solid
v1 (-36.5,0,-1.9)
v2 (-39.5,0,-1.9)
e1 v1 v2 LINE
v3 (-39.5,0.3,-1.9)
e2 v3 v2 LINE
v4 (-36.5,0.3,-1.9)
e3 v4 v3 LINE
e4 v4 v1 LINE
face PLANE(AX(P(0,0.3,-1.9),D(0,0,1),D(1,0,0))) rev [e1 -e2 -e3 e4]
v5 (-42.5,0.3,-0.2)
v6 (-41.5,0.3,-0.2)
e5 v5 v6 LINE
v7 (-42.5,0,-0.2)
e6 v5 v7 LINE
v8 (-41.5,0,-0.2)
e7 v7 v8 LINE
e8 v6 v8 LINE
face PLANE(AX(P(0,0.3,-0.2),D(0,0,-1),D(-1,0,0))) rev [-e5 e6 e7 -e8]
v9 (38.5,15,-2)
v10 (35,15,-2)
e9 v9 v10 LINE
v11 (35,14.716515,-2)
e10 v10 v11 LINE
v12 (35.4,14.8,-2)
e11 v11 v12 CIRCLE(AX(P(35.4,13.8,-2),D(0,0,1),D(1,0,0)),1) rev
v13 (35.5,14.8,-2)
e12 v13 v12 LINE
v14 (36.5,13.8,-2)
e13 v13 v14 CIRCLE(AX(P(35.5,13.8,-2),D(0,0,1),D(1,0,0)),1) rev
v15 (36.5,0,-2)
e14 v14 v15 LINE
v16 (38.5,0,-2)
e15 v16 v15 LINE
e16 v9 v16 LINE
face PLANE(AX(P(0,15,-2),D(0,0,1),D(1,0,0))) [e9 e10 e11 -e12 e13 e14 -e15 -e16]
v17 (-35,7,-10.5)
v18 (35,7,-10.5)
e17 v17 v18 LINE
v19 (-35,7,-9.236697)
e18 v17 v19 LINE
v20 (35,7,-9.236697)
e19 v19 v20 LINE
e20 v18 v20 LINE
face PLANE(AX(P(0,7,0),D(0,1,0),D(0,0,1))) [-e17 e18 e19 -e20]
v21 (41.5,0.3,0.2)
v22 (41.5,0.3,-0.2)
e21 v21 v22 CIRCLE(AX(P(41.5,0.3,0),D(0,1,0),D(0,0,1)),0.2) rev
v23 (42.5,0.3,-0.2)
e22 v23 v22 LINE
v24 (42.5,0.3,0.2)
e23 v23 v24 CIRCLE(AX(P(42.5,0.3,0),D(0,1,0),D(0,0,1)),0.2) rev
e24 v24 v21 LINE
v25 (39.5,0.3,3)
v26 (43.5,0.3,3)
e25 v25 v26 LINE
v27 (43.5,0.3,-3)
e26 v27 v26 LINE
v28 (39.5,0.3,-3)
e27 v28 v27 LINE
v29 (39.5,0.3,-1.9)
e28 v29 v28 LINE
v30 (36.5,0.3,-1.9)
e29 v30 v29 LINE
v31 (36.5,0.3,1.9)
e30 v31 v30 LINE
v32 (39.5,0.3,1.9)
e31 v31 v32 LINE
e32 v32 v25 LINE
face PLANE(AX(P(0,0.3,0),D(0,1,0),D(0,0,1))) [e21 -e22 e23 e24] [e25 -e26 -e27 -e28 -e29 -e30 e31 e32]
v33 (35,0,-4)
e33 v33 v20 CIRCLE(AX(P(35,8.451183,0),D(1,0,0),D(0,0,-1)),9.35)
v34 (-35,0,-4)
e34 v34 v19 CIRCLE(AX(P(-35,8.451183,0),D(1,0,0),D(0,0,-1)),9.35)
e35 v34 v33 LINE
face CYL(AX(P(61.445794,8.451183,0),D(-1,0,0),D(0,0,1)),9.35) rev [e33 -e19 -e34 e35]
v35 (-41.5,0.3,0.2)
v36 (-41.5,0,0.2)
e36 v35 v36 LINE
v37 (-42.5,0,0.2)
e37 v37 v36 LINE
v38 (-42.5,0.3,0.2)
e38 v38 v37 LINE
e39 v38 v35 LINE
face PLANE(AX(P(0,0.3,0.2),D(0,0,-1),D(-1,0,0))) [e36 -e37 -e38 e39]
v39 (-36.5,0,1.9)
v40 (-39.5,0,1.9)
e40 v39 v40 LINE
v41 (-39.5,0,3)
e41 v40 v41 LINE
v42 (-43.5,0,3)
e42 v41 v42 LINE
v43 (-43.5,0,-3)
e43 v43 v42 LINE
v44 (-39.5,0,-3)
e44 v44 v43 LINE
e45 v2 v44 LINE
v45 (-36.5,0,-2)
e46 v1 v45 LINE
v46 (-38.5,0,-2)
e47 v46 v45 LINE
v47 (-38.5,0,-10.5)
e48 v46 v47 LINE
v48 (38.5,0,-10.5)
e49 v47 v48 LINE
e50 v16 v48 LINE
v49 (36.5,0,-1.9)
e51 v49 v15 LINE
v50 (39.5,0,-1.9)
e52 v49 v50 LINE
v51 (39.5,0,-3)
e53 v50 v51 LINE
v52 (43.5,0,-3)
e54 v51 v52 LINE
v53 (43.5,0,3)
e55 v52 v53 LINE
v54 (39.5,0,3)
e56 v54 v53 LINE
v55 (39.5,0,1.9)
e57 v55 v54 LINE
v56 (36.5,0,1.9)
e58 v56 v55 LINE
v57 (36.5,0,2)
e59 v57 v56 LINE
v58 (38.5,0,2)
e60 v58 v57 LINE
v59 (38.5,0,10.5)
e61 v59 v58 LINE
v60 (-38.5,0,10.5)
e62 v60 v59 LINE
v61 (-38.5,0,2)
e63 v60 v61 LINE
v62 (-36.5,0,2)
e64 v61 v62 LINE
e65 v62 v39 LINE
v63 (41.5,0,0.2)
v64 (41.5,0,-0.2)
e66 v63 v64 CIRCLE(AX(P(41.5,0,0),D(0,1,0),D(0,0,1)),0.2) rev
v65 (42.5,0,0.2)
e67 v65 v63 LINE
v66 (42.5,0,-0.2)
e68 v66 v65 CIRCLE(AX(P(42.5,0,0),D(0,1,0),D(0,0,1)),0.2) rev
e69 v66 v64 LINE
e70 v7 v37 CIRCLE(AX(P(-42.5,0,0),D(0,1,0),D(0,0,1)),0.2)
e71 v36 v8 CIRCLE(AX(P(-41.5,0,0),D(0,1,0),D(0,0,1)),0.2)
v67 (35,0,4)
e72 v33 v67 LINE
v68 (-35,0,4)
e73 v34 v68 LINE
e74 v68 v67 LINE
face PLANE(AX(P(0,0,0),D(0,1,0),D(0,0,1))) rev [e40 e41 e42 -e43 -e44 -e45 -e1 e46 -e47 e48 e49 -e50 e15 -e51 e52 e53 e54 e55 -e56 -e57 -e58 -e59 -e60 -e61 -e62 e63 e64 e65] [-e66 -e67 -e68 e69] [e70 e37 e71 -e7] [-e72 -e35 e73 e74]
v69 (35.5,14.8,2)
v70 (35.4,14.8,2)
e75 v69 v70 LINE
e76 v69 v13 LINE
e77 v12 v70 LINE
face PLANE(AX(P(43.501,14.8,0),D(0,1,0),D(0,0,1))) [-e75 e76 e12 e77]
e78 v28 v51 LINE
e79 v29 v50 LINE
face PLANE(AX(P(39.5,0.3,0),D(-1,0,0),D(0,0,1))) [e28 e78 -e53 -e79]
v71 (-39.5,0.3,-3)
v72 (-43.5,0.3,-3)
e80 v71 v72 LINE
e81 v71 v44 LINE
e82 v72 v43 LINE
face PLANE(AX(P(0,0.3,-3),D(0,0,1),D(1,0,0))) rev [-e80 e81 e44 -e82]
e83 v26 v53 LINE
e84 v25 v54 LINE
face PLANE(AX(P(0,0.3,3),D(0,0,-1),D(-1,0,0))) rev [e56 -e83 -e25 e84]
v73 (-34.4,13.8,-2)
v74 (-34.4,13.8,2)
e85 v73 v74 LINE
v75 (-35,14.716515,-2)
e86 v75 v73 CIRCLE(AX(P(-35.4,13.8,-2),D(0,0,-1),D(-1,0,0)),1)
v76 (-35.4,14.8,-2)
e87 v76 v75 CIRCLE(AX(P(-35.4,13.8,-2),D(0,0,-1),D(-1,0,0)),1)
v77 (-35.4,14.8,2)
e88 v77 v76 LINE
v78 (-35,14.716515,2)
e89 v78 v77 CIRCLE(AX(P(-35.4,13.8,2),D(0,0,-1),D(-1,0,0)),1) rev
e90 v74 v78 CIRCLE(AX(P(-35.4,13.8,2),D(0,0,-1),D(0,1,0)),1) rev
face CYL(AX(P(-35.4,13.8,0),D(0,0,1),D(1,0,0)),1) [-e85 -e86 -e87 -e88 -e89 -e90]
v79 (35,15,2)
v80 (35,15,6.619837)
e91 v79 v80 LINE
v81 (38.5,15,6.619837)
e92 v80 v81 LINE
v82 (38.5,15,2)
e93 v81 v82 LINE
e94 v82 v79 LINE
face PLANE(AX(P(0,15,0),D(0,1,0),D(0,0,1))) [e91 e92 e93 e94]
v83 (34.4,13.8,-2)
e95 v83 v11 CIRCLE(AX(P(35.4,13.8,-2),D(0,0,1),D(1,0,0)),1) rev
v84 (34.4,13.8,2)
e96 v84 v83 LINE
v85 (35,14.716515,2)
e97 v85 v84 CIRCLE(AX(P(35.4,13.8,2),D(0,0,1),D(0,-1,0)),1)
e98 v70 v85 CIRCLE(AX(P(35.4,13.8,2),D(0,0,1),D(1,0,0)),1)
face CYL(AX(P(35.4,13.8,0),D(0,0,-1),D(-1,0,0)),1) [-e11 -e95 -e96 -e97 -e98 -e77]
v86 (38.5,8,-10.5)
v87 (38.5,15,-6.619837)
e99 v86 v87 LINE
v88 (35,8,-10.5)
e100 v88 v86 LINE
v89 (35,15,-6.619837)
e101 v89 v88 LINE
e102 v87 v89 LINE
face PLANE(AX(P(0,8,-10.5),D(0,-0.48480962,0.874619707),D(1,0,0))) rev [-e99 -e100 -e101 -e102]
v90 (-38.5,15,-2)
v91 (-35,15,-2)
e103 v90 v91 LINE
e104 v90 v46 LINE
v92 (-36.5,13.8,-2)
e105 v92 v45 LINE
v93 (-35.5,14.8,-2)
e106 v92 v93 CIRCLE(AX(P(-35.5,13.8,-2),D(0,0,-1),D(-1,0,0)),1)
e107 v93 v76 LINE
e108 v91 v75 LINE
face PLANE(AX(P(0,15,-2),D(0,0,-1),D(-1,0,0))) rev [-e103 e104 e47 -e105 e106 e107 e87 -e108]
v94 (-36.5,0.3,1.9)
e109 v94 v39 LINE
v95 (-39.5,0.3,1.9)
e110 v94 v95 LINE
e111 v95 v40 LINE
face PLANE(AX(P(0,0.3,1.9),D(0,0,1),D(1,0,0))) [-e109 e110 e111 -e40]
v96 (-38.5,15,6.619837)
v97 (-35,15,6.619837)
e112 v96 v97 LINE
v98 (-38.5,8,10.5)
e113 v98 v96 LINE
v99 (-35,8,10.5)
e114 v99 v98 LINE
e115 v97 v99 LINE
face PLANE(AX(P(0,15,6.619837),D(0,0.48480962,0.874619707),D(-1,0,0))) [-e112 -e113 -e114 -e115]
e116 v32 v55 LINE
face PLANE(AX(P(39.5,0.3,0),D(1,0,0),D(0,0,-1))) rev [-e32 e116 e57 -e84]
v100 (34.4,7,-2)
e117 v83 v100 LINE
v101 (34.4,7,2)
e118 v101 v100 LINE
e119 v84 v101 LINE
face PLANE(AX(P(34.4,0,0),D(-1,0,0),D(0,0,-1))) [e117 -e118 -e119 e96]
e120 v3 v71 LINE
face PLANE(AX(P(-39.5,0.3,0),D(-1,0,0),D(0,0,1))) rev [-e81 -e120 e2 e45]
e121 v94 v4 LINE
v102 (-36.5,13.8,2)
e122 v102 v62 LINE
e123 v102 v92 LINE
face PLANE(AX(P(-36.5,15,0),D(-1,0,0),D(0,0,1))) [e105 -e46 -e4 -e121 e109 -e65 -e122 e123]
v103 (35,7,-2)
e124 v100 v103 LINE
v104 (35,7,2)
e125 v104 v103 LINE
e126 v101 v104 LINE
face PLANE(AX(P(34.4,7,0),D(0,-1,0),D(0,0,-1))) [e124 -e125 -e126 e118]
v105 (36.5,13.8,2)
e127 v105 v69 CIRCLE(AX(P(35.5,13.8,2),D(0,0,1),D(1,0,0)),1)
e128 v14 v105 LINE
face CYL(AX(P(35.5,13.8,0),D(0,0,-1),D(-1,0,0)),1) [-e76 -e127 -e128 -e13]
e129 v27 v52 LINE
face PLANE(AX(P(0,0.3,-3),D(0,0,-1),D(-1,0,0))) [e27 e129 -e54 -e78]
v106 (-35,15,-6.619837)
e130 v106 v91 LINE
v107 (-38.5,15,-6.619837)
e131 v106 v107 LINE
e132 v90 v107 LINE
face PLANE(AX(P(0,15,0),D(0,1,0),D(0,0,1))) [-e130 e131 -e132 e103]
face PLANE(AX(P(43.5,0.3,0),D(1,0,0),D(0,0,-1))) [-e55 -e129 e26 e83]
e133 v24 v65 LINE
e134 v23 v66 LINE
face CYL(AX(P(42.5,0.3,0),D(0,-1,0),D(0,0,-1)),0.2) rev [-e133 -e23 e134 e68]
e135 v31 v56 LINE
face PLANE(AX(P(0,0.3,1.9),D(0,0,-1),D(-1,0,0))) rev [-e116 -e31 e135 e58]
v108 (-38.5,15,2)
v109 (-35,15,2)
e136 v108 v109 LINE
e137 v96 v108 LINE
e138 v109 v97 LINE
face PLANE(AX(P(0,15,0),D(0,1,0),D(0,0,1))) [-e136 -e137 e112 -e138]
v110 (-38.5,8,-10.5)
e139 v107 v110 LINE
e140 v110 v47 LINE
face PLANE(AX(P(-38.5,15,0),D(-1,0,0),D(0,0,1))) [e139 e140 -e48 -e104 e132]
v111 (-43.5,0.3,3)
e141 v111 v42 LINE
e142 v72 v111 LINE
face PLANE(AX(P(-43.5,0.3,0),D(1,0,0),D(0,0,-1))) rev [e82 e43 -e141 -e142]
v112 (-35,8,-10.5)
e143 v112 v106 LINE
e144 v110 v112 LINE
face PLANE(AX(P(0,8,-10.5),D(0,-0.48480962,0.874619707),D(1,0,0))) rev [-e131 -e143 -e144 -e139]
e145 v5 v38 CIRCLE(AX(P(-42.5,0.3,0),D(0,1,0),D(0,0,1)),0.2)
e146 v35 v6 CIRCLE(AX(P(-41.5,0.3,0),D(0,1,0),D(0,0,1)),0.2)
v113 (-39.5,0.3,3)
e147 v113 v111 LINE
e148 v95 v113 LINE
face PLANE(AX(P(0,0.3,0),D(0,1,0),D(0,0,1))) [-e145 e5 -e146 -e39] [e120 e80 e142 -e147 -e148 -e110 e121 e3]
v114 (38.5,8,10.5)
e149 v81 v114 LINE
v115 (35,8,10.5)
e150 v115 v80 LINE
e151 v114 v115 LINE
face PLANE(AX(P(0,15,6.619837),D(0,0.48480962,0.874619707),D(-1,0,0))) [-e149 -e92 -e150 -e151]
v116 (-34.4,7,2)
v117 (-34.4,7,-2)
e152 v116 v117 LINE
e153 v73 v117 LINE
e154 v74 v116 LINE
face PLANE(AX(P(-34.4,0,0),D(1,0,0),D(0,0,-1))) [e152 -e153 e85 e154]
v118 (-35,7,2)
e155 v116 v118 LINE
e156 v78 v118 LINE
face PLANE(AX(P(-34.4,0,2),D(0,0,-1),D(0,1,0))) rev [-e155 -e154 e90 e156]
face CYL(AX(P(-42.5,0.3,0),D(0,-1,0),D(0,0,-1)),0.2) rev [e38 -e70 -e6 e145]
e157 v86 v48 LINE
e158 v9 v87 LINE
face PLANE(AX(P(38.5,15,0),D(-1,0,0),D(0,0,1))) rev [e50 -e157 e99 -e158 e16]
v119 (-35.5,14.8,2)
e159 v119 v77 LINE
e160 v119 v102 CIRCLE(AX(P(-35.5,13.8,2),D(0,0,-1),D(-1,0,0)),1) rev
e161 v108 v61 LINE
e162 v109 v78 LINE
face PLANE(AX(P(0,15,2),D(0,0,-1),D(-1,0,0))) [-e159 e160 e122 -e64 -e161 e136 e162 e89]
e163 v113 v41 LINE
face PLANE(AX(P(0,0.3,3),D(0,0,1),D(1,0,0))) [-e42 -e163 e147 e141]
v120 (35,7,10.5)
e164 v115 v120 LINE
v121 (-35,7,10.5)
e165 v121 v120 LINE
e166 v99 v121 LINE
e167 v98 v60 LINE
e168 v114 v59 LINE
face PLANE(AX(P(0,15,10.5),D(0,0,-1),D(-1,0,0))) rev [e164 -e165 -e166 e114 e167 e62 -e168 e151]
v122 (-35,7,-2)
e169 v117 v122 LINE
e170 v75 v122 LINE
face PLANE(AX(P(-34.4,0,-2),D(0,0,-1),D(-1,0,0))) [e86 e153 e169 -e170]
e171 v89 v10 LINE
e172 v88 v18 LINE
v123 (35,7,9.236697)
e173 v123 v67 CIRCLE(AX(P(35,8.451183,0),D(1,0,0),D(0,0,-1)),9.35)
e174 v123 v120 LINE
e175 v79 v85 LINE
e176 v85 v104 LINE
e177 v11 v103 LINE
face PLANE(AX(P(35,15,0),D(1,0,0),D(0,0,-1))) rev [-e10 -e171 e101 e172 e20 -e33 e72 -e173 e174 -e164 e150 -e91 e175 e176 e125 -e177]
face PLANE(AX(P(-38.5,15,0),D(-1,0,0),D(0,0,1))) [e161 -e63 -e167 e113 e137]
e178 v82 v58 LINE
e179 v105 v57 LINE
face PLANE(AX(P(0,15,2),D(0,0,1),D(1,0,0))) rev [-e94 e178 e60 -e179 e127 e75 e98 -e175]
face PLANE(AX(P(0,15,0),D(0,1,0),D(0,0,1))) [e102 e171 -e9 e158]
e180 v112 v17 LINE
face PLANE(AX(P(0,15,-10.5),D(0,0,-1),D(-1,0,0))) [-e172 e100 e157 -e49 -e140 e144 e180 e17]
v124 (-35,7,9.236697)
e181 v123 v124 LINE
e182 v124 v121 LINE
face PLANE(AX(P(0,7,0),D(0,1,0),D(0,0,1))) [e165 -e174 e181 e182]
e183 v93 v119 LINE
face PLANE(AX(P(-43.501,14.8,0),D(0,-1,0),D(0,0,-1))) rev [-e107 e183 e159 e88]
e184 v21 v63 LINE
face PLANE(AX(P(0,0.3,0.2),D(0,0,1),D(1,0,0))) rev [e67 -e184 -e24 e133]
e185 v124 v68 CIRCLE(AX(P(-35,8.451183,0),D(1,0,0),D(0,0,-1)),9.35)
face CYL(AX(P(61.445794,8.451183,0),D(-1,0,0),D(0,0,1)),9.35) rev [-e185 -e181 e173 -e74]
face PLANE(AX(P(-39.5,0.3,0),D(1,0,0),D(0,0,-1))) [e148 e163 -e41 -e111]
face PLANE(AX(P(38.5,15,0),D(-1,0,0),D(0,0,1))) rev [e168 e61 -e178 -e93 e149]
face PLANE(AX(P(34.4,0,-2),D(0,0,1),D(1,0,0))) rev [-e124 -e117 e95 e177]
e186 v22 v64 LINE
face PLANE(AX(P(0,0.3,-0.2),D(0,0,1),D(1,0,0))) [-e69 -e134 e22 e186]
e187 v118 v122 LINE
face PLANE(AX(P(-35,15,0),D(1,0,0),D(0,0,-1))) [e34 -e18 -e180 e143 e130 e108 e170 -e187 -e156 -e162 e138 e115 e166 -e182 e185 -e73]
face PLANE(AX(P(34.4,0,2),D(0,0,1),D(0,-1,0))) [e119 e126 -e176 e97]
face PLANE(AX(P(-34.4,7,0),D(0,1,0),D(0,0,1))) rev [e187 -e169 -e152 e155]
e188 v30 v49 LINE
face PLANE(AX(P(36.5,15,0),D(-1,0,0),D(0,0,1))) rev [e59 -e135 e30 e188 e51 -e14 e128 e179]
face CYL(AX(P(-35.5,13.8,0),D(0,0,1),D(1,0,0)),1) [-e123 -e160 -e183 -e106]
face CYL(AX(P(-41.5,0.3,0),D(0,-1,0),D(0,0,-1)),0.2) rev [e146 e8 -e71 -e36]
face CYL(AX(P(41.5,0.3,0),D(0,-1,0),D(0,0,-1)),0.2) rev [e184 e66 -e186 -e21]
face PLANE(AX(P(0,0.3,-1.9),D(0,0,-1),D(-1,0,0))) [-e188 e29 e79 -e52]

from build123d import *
from OCP.BRepFilletAPI import BRepFilletAPI_MakeChamfer

# Parameters (mm, degrees)
DODANIE_WYCI_GNI_CIE1_DEPTH   = 15
DODANIE_WYCI_GNI_CIE1_2_DEPTH = 15
SZKIC1_3_W                    = 70
SZKIC1_3_H                    = 6.5
DODANIE_WYCI_GNI_CIE2_DEPTH   = 7
SZKIC2_R                      = 9.35
WYTNIJ_WYCI_GNI_CIE1_DEPTH    = 70
DODANIE_WYCI_GNI_CIE3_DEPTH   = 0.3
SFAZOWANIE1_SIZE              = 7
SFAZOWANIE1_SIZE2             = 3.88016336
WYTNIJ_WYCI_GNI_CIE2_REACH    = 82.607
SZKIC4_W                      = 4
SZKIC4_H                      = 0.2
SZKIC4_3_W                    = 4
SZKIC4_3_H                    = 7.8
DODANIE_WYCI_GNI_CIE4_DEPTH   = 0.6
ZAOKR_GLENIE1_R               = 1


with BuildPart() as part:
    # Szkic1 → Dodanie-wyciągnięcie1 (new body)
    with BuildSketch(Plane(origin=(0, 0, 0), x_dir=(1, 0, 0), z_dir=(0, 1, 0))):
        Polygon((-38.5, -2), (-38.5, -10.5), (-35, -10.5), (-35, 10.5), (-38.5, 10.5), (-38.5, 2), (-36.5, 2), (-36.5, -2), align=None)
    extrude(amount=DODANIE_WYCI_GNI_CIE1_DEPTH)



with BuildPart() as body_2:
    # Szkic1 → Dodanie-wyci_gni_cie1 2 (new body)
    with BuildSketch(Plane(origin=(0, 0, 0), x_dir=(1, 0, 0), z_dir=(0, 1, 0))):
        Polygon((35, 10.5), (35, -10.5), (38.5, -10.5), (38.5, -2), (36.5, -2), (36.5, 2), (38.5, 2), (38.5, 10.5), align=None)
    extrude(amount=DODANIE_WYCI_GNI_CIE1_2_DEPTH)


with BuildPart() as part_1:
    add(part.part)

    add(body_2.part)  # Dodanie-wyciągnięcie2 merges body 2
    # Szkic1<3> → Dodanie-wyciągnięcie2 (add)
    with BuildSketch(Plane(origin=(0, 0, 0), x_dir=(1, 0, 0), z_dir=(0, 1, 0))):
        with Locations((0, -7.25)):
            Rectangle(SZKIC1_3_W, SZKIC1_3_H)
        with Locations((0, 7.25)):
            Rectangle(SZKIC1_3_W, SZKIC1_3_H)
    extrude(amount=DODANIE_WYCI_GNI_CIE2_DEPTH)

    # Szkic2 → Wytnij-wyciągnięcie1 (cut)
    with BuildSketch(Plane(origin=(-35, 0, 0), x_dir=(0, 0, -1), z_dir=(1, 0, 0))):
        with Locations((0, 8.451183349)):
            Circle(SZKIC2_R)
    extrude(amount=WYTNIJ_WYCI_GNI_CIE1_DEPTH, mode=Mode.SUBTRACT)

    # Szkic3 → Dodanie-wyciągnięcie3 (add)
    with BuildSketch(Plane(origin=(0, 0, 0), x_dir=(1, 0, 0), z_dir=(0, 1, 0))):
        with BuildLine():
            Line((-36.5, 0), (-36.5, 1.9))
            Line((-36.5, 1.9), (-39.5, 1.9))
            Line((-39.5, 1.9), (-39.5, 3))
            Line((-39.5, 3), (-43.5, 3))
            Line((-43.5, 3), (-43.5, 0))
            Line((-43.5, 0), (-42.7, 0))
            ThreePointArc((-42.7, 0), (-42.641421356, 0.141421356), (-42.5, 0.2))
            Line((-42.5, 0.2), (-41.5, 0.2))
            ThreePointArc((-41.5, 0.2), (-41.358578644, 0.141421356), (-41.3, 0))
            Line((-41.3, 0), (-36.5, 0))
        make_face()
        with BuildLine():
            Line((-36.5, -1.9), (-36.5, 0))
            Line((-36.5, 0), (-41.3, 0))
            ThreePointArc((-41.3, 0), (-41.358578644, -0.141421356), (-41.5, -0.2))
            Line((-41.5, -0.2), (-42.5, -0.2))
            ThreePointArc((-42.5, -0.2), (-42.641421356, -0.141421356), (-42.7, 0))
            Line((-42.7, 0), (-43.5, 0))
            Line((-43.5, 0), (-43.5, -3))
            Line((-43.5, -3), (-39.5, -3))
            Line((-39.5, -3), (-39.5, -1.9))
            Line((-39.5, -1.9), (-36.5, -1.9))
        make_face()
        with BuildLine():
            Line((41.5, 0.2), (42.5, 0.2))
            ThreePointArc((42.5, 0.2), (42.641421356, 0.141421356), (42.7, 0))
            Line((42.7, 0), (43.5, 0))
            Line((43.5, 0), (43.5, 3))
            Line((43.5, 3), (39.5, 3))
            Line((39.5, 3), (39.5, 1.9))
            Line((39.5, 1.9), (36.5, 1.9))
            Line((36.5, 1.9), (36.5, 0))
            Line((36.5, 0), (41.3, 0))
            ThreePointArc((41.3, 0), (41.358578644, 0.141421356), (41.5, 0.2))
        make_face()
        with BuildLine():
            Line((43.5, 0), (42.7, 0))
            ThreePointArc((42.7, 0), (42.641421356, -0.141421356), (42.5, -0.2))
            Line((42.5, -0.2), (41.5, -0.2))
            ThreePointArc((41.5, -0.2), (41.358578644, -0.141421356), (41.3, 0))
            Line((41.3, 0), (36.5, 0))
            Line((36.5, 0), (36.5, -1.9))
            Line((36.5, -1.9), (39.5, -1.9))
            Line((39.5, -1.9), (39.5, -3))
            Line((39.5, -3), (43.5, -3))
            Line((43.5, -3), (43.5, 0))
        make_face()
    extrude(amount=DODANIE_WYCI_GNI_CIE3_DEPTH)

    # Sfazowanie1: one chamfer whose edges measure the first distance from different faces: ONE call of the kernel's chamfer builder (chamfer() names one face for all edges)
    sfazowanie1_edges_1 = [part_1.edges().sort_by_distance(p)[0] for p in [
        (-36.75, 15, 10.5),
        (36.75, 15, 10.5),
    ]]
    sfazowanie1_side_1 = [part_1.faces().sort_by_distance(p)[0] for p in [
        (0, 4.205882353, 10.5),
    ]]
    sfazowanie1_edges_2 = [part_1.edges().sort_by_distance(p)[0] for p in [
        (-36.75, 15, -10.5),
        (36.75, 15, -10.5),
    ]]
    sfazowanie1_side_2 = [part_1.faces().sort_by_distance(p)[0] for p in [
        (0, 4.205882353, -10.5),
    ]]
    sfazowanie1 = BRepFilletAPI_MakeChamfer(part_1.part.solid().wrapped)
    for e in sfazowanie1_edges_1:
        sfazowanie1.Add(SFAZOWANIE1_SIZE, SFAZOWANIE1_SIZE2, e.wrapped, sfazowanie1_side_1[0].wrapped)  # the first distance lies on this face
    for e in sfazowanie1_edges_2:
        sfazowanie1.Add(SFAZOWANIE1_SIZE, SFAZOWANIE1_SIZE2, e.wrapped, sfazowanie1_side_2[0].wrapped)  # the first distance lies on this face
    add(Compound.cast(sfazowanie1.Shape()), mode=Mode.REPLACE)

    # Szkic4 → Wytnij-wyciągnięcie2 (cut, up to next)
    with BuildSketch(Plane(origin=(-35, 0, 0), x_dir=(0, 0, -1), z_dir=(1, 0, 0)), mode=Mode.PRIVATE) as wytnij_wyci_gni_cie2_sk1:
        with Locations((0, 14.9)):
            Rectangle(SZKIC4_W, SZKIC4_H)
    wytnij_wyci_gni_cie2_tool1 = extrude(wytnij_wyci_gni_cie2_sk1.sketch, amount=-WYTNIJ_WYCI_GNI_CIE2_REACH, mode=Mode.PRIVATE) & part_1.part
    wytnij_wyci_gni_cie2 = wytnij_wyci_gni_cie2_tool1.solids().sort_by_distance((-35, 14.9, 0))[0]
    add(wytnij_wyci_gni_cie2, mode=Mode.SUBTRACT)

    # Szkic4<3> → Dodanie-wyciągnięcie4 (add)
    with BuildSketch(Plane(origin=(-35, 0, 0), x_dir=(0, 0, -1), z_dir=(1, 0, 0))):
        with Locations((0, 10.9)):
            Rectangle(SZKIC4_3_W, SZKIC4_3_H)
    dodanie_wyci_gni_cie4 = extrude(amount=DODANIE_WYCI_GNI_CIE4_DEPTH)

    # Lustro1: Wytnij-wyciągnięcie2, Dodanie-wyciągnięcie4 across plane
    add(wytnij_wyci_gni_cie2.mirror(Plane(origin=(0, 0, 0), x_dir=(0, 0, 1), z_dir=(1, 0, 0))), mode=Mode.SUBTRACT)
    add(dodanie_wyci_gni_cie4.mirror(Plane(origin=(0, 0, 0), x_dir=(0, 0, 1), z_dir=(1, 0, 0))))

    # Zaokrąglenie1
    # the kernel refuses this fillet: 1 mm, written as the material it takes off along each edge
    with BuildSketch(Plane(origin=(-36.5, 14.8, -2), x_dir=(0, -1, 0), z_dir=(0, 0, 1)), Plane(origin=(-34.4, 14.8, -2), x_dir=(-1, 0, 0), z_dir=(0, 0, 1))) as zaokr_glenie1_piece_1:
        with BuildLine():
            CenterArc((ZAOKR_GLENIE1_R, ZAOKR_GLENIE1_R), ZAOKR_GLENIE1_R, 180, 90)
            Line((0, ZAOKR_GLENIE1_R), (0, 0))
            Line((0, 0), (ZAOKR_GLENIE1_R, 0))
        make_face()
    extrude(amount=4, mode=Mode.SUBTRACT)
    with BuildSketch(Plane(origin=(36.5, 14.8, -2), x_dir=(0, -1, 0), z_dir=(0, 0, 1)), Plane(origin=(34.4, 14.8, -2), x_dir=(1, 0, 0), z_dir=(0, 0, 1))) as zaokr_glenie1_piece_2:
        with BuildLine():
            CenterArc((ZAOKR_GLENIE1_R, -ZAOKR_GLENIE1_R), ZAOKR_GLENIE1_R, 90, 90)
            Line((0, -ZAOKR_GLENIE1_R), (0, 0))
            Line((0, 0), (ZAOKR_GLENIE1_R, 0))
        make_face()
    extrude(amount=4, mode=Mode.SUBTRACT)


solid = part_1.part
